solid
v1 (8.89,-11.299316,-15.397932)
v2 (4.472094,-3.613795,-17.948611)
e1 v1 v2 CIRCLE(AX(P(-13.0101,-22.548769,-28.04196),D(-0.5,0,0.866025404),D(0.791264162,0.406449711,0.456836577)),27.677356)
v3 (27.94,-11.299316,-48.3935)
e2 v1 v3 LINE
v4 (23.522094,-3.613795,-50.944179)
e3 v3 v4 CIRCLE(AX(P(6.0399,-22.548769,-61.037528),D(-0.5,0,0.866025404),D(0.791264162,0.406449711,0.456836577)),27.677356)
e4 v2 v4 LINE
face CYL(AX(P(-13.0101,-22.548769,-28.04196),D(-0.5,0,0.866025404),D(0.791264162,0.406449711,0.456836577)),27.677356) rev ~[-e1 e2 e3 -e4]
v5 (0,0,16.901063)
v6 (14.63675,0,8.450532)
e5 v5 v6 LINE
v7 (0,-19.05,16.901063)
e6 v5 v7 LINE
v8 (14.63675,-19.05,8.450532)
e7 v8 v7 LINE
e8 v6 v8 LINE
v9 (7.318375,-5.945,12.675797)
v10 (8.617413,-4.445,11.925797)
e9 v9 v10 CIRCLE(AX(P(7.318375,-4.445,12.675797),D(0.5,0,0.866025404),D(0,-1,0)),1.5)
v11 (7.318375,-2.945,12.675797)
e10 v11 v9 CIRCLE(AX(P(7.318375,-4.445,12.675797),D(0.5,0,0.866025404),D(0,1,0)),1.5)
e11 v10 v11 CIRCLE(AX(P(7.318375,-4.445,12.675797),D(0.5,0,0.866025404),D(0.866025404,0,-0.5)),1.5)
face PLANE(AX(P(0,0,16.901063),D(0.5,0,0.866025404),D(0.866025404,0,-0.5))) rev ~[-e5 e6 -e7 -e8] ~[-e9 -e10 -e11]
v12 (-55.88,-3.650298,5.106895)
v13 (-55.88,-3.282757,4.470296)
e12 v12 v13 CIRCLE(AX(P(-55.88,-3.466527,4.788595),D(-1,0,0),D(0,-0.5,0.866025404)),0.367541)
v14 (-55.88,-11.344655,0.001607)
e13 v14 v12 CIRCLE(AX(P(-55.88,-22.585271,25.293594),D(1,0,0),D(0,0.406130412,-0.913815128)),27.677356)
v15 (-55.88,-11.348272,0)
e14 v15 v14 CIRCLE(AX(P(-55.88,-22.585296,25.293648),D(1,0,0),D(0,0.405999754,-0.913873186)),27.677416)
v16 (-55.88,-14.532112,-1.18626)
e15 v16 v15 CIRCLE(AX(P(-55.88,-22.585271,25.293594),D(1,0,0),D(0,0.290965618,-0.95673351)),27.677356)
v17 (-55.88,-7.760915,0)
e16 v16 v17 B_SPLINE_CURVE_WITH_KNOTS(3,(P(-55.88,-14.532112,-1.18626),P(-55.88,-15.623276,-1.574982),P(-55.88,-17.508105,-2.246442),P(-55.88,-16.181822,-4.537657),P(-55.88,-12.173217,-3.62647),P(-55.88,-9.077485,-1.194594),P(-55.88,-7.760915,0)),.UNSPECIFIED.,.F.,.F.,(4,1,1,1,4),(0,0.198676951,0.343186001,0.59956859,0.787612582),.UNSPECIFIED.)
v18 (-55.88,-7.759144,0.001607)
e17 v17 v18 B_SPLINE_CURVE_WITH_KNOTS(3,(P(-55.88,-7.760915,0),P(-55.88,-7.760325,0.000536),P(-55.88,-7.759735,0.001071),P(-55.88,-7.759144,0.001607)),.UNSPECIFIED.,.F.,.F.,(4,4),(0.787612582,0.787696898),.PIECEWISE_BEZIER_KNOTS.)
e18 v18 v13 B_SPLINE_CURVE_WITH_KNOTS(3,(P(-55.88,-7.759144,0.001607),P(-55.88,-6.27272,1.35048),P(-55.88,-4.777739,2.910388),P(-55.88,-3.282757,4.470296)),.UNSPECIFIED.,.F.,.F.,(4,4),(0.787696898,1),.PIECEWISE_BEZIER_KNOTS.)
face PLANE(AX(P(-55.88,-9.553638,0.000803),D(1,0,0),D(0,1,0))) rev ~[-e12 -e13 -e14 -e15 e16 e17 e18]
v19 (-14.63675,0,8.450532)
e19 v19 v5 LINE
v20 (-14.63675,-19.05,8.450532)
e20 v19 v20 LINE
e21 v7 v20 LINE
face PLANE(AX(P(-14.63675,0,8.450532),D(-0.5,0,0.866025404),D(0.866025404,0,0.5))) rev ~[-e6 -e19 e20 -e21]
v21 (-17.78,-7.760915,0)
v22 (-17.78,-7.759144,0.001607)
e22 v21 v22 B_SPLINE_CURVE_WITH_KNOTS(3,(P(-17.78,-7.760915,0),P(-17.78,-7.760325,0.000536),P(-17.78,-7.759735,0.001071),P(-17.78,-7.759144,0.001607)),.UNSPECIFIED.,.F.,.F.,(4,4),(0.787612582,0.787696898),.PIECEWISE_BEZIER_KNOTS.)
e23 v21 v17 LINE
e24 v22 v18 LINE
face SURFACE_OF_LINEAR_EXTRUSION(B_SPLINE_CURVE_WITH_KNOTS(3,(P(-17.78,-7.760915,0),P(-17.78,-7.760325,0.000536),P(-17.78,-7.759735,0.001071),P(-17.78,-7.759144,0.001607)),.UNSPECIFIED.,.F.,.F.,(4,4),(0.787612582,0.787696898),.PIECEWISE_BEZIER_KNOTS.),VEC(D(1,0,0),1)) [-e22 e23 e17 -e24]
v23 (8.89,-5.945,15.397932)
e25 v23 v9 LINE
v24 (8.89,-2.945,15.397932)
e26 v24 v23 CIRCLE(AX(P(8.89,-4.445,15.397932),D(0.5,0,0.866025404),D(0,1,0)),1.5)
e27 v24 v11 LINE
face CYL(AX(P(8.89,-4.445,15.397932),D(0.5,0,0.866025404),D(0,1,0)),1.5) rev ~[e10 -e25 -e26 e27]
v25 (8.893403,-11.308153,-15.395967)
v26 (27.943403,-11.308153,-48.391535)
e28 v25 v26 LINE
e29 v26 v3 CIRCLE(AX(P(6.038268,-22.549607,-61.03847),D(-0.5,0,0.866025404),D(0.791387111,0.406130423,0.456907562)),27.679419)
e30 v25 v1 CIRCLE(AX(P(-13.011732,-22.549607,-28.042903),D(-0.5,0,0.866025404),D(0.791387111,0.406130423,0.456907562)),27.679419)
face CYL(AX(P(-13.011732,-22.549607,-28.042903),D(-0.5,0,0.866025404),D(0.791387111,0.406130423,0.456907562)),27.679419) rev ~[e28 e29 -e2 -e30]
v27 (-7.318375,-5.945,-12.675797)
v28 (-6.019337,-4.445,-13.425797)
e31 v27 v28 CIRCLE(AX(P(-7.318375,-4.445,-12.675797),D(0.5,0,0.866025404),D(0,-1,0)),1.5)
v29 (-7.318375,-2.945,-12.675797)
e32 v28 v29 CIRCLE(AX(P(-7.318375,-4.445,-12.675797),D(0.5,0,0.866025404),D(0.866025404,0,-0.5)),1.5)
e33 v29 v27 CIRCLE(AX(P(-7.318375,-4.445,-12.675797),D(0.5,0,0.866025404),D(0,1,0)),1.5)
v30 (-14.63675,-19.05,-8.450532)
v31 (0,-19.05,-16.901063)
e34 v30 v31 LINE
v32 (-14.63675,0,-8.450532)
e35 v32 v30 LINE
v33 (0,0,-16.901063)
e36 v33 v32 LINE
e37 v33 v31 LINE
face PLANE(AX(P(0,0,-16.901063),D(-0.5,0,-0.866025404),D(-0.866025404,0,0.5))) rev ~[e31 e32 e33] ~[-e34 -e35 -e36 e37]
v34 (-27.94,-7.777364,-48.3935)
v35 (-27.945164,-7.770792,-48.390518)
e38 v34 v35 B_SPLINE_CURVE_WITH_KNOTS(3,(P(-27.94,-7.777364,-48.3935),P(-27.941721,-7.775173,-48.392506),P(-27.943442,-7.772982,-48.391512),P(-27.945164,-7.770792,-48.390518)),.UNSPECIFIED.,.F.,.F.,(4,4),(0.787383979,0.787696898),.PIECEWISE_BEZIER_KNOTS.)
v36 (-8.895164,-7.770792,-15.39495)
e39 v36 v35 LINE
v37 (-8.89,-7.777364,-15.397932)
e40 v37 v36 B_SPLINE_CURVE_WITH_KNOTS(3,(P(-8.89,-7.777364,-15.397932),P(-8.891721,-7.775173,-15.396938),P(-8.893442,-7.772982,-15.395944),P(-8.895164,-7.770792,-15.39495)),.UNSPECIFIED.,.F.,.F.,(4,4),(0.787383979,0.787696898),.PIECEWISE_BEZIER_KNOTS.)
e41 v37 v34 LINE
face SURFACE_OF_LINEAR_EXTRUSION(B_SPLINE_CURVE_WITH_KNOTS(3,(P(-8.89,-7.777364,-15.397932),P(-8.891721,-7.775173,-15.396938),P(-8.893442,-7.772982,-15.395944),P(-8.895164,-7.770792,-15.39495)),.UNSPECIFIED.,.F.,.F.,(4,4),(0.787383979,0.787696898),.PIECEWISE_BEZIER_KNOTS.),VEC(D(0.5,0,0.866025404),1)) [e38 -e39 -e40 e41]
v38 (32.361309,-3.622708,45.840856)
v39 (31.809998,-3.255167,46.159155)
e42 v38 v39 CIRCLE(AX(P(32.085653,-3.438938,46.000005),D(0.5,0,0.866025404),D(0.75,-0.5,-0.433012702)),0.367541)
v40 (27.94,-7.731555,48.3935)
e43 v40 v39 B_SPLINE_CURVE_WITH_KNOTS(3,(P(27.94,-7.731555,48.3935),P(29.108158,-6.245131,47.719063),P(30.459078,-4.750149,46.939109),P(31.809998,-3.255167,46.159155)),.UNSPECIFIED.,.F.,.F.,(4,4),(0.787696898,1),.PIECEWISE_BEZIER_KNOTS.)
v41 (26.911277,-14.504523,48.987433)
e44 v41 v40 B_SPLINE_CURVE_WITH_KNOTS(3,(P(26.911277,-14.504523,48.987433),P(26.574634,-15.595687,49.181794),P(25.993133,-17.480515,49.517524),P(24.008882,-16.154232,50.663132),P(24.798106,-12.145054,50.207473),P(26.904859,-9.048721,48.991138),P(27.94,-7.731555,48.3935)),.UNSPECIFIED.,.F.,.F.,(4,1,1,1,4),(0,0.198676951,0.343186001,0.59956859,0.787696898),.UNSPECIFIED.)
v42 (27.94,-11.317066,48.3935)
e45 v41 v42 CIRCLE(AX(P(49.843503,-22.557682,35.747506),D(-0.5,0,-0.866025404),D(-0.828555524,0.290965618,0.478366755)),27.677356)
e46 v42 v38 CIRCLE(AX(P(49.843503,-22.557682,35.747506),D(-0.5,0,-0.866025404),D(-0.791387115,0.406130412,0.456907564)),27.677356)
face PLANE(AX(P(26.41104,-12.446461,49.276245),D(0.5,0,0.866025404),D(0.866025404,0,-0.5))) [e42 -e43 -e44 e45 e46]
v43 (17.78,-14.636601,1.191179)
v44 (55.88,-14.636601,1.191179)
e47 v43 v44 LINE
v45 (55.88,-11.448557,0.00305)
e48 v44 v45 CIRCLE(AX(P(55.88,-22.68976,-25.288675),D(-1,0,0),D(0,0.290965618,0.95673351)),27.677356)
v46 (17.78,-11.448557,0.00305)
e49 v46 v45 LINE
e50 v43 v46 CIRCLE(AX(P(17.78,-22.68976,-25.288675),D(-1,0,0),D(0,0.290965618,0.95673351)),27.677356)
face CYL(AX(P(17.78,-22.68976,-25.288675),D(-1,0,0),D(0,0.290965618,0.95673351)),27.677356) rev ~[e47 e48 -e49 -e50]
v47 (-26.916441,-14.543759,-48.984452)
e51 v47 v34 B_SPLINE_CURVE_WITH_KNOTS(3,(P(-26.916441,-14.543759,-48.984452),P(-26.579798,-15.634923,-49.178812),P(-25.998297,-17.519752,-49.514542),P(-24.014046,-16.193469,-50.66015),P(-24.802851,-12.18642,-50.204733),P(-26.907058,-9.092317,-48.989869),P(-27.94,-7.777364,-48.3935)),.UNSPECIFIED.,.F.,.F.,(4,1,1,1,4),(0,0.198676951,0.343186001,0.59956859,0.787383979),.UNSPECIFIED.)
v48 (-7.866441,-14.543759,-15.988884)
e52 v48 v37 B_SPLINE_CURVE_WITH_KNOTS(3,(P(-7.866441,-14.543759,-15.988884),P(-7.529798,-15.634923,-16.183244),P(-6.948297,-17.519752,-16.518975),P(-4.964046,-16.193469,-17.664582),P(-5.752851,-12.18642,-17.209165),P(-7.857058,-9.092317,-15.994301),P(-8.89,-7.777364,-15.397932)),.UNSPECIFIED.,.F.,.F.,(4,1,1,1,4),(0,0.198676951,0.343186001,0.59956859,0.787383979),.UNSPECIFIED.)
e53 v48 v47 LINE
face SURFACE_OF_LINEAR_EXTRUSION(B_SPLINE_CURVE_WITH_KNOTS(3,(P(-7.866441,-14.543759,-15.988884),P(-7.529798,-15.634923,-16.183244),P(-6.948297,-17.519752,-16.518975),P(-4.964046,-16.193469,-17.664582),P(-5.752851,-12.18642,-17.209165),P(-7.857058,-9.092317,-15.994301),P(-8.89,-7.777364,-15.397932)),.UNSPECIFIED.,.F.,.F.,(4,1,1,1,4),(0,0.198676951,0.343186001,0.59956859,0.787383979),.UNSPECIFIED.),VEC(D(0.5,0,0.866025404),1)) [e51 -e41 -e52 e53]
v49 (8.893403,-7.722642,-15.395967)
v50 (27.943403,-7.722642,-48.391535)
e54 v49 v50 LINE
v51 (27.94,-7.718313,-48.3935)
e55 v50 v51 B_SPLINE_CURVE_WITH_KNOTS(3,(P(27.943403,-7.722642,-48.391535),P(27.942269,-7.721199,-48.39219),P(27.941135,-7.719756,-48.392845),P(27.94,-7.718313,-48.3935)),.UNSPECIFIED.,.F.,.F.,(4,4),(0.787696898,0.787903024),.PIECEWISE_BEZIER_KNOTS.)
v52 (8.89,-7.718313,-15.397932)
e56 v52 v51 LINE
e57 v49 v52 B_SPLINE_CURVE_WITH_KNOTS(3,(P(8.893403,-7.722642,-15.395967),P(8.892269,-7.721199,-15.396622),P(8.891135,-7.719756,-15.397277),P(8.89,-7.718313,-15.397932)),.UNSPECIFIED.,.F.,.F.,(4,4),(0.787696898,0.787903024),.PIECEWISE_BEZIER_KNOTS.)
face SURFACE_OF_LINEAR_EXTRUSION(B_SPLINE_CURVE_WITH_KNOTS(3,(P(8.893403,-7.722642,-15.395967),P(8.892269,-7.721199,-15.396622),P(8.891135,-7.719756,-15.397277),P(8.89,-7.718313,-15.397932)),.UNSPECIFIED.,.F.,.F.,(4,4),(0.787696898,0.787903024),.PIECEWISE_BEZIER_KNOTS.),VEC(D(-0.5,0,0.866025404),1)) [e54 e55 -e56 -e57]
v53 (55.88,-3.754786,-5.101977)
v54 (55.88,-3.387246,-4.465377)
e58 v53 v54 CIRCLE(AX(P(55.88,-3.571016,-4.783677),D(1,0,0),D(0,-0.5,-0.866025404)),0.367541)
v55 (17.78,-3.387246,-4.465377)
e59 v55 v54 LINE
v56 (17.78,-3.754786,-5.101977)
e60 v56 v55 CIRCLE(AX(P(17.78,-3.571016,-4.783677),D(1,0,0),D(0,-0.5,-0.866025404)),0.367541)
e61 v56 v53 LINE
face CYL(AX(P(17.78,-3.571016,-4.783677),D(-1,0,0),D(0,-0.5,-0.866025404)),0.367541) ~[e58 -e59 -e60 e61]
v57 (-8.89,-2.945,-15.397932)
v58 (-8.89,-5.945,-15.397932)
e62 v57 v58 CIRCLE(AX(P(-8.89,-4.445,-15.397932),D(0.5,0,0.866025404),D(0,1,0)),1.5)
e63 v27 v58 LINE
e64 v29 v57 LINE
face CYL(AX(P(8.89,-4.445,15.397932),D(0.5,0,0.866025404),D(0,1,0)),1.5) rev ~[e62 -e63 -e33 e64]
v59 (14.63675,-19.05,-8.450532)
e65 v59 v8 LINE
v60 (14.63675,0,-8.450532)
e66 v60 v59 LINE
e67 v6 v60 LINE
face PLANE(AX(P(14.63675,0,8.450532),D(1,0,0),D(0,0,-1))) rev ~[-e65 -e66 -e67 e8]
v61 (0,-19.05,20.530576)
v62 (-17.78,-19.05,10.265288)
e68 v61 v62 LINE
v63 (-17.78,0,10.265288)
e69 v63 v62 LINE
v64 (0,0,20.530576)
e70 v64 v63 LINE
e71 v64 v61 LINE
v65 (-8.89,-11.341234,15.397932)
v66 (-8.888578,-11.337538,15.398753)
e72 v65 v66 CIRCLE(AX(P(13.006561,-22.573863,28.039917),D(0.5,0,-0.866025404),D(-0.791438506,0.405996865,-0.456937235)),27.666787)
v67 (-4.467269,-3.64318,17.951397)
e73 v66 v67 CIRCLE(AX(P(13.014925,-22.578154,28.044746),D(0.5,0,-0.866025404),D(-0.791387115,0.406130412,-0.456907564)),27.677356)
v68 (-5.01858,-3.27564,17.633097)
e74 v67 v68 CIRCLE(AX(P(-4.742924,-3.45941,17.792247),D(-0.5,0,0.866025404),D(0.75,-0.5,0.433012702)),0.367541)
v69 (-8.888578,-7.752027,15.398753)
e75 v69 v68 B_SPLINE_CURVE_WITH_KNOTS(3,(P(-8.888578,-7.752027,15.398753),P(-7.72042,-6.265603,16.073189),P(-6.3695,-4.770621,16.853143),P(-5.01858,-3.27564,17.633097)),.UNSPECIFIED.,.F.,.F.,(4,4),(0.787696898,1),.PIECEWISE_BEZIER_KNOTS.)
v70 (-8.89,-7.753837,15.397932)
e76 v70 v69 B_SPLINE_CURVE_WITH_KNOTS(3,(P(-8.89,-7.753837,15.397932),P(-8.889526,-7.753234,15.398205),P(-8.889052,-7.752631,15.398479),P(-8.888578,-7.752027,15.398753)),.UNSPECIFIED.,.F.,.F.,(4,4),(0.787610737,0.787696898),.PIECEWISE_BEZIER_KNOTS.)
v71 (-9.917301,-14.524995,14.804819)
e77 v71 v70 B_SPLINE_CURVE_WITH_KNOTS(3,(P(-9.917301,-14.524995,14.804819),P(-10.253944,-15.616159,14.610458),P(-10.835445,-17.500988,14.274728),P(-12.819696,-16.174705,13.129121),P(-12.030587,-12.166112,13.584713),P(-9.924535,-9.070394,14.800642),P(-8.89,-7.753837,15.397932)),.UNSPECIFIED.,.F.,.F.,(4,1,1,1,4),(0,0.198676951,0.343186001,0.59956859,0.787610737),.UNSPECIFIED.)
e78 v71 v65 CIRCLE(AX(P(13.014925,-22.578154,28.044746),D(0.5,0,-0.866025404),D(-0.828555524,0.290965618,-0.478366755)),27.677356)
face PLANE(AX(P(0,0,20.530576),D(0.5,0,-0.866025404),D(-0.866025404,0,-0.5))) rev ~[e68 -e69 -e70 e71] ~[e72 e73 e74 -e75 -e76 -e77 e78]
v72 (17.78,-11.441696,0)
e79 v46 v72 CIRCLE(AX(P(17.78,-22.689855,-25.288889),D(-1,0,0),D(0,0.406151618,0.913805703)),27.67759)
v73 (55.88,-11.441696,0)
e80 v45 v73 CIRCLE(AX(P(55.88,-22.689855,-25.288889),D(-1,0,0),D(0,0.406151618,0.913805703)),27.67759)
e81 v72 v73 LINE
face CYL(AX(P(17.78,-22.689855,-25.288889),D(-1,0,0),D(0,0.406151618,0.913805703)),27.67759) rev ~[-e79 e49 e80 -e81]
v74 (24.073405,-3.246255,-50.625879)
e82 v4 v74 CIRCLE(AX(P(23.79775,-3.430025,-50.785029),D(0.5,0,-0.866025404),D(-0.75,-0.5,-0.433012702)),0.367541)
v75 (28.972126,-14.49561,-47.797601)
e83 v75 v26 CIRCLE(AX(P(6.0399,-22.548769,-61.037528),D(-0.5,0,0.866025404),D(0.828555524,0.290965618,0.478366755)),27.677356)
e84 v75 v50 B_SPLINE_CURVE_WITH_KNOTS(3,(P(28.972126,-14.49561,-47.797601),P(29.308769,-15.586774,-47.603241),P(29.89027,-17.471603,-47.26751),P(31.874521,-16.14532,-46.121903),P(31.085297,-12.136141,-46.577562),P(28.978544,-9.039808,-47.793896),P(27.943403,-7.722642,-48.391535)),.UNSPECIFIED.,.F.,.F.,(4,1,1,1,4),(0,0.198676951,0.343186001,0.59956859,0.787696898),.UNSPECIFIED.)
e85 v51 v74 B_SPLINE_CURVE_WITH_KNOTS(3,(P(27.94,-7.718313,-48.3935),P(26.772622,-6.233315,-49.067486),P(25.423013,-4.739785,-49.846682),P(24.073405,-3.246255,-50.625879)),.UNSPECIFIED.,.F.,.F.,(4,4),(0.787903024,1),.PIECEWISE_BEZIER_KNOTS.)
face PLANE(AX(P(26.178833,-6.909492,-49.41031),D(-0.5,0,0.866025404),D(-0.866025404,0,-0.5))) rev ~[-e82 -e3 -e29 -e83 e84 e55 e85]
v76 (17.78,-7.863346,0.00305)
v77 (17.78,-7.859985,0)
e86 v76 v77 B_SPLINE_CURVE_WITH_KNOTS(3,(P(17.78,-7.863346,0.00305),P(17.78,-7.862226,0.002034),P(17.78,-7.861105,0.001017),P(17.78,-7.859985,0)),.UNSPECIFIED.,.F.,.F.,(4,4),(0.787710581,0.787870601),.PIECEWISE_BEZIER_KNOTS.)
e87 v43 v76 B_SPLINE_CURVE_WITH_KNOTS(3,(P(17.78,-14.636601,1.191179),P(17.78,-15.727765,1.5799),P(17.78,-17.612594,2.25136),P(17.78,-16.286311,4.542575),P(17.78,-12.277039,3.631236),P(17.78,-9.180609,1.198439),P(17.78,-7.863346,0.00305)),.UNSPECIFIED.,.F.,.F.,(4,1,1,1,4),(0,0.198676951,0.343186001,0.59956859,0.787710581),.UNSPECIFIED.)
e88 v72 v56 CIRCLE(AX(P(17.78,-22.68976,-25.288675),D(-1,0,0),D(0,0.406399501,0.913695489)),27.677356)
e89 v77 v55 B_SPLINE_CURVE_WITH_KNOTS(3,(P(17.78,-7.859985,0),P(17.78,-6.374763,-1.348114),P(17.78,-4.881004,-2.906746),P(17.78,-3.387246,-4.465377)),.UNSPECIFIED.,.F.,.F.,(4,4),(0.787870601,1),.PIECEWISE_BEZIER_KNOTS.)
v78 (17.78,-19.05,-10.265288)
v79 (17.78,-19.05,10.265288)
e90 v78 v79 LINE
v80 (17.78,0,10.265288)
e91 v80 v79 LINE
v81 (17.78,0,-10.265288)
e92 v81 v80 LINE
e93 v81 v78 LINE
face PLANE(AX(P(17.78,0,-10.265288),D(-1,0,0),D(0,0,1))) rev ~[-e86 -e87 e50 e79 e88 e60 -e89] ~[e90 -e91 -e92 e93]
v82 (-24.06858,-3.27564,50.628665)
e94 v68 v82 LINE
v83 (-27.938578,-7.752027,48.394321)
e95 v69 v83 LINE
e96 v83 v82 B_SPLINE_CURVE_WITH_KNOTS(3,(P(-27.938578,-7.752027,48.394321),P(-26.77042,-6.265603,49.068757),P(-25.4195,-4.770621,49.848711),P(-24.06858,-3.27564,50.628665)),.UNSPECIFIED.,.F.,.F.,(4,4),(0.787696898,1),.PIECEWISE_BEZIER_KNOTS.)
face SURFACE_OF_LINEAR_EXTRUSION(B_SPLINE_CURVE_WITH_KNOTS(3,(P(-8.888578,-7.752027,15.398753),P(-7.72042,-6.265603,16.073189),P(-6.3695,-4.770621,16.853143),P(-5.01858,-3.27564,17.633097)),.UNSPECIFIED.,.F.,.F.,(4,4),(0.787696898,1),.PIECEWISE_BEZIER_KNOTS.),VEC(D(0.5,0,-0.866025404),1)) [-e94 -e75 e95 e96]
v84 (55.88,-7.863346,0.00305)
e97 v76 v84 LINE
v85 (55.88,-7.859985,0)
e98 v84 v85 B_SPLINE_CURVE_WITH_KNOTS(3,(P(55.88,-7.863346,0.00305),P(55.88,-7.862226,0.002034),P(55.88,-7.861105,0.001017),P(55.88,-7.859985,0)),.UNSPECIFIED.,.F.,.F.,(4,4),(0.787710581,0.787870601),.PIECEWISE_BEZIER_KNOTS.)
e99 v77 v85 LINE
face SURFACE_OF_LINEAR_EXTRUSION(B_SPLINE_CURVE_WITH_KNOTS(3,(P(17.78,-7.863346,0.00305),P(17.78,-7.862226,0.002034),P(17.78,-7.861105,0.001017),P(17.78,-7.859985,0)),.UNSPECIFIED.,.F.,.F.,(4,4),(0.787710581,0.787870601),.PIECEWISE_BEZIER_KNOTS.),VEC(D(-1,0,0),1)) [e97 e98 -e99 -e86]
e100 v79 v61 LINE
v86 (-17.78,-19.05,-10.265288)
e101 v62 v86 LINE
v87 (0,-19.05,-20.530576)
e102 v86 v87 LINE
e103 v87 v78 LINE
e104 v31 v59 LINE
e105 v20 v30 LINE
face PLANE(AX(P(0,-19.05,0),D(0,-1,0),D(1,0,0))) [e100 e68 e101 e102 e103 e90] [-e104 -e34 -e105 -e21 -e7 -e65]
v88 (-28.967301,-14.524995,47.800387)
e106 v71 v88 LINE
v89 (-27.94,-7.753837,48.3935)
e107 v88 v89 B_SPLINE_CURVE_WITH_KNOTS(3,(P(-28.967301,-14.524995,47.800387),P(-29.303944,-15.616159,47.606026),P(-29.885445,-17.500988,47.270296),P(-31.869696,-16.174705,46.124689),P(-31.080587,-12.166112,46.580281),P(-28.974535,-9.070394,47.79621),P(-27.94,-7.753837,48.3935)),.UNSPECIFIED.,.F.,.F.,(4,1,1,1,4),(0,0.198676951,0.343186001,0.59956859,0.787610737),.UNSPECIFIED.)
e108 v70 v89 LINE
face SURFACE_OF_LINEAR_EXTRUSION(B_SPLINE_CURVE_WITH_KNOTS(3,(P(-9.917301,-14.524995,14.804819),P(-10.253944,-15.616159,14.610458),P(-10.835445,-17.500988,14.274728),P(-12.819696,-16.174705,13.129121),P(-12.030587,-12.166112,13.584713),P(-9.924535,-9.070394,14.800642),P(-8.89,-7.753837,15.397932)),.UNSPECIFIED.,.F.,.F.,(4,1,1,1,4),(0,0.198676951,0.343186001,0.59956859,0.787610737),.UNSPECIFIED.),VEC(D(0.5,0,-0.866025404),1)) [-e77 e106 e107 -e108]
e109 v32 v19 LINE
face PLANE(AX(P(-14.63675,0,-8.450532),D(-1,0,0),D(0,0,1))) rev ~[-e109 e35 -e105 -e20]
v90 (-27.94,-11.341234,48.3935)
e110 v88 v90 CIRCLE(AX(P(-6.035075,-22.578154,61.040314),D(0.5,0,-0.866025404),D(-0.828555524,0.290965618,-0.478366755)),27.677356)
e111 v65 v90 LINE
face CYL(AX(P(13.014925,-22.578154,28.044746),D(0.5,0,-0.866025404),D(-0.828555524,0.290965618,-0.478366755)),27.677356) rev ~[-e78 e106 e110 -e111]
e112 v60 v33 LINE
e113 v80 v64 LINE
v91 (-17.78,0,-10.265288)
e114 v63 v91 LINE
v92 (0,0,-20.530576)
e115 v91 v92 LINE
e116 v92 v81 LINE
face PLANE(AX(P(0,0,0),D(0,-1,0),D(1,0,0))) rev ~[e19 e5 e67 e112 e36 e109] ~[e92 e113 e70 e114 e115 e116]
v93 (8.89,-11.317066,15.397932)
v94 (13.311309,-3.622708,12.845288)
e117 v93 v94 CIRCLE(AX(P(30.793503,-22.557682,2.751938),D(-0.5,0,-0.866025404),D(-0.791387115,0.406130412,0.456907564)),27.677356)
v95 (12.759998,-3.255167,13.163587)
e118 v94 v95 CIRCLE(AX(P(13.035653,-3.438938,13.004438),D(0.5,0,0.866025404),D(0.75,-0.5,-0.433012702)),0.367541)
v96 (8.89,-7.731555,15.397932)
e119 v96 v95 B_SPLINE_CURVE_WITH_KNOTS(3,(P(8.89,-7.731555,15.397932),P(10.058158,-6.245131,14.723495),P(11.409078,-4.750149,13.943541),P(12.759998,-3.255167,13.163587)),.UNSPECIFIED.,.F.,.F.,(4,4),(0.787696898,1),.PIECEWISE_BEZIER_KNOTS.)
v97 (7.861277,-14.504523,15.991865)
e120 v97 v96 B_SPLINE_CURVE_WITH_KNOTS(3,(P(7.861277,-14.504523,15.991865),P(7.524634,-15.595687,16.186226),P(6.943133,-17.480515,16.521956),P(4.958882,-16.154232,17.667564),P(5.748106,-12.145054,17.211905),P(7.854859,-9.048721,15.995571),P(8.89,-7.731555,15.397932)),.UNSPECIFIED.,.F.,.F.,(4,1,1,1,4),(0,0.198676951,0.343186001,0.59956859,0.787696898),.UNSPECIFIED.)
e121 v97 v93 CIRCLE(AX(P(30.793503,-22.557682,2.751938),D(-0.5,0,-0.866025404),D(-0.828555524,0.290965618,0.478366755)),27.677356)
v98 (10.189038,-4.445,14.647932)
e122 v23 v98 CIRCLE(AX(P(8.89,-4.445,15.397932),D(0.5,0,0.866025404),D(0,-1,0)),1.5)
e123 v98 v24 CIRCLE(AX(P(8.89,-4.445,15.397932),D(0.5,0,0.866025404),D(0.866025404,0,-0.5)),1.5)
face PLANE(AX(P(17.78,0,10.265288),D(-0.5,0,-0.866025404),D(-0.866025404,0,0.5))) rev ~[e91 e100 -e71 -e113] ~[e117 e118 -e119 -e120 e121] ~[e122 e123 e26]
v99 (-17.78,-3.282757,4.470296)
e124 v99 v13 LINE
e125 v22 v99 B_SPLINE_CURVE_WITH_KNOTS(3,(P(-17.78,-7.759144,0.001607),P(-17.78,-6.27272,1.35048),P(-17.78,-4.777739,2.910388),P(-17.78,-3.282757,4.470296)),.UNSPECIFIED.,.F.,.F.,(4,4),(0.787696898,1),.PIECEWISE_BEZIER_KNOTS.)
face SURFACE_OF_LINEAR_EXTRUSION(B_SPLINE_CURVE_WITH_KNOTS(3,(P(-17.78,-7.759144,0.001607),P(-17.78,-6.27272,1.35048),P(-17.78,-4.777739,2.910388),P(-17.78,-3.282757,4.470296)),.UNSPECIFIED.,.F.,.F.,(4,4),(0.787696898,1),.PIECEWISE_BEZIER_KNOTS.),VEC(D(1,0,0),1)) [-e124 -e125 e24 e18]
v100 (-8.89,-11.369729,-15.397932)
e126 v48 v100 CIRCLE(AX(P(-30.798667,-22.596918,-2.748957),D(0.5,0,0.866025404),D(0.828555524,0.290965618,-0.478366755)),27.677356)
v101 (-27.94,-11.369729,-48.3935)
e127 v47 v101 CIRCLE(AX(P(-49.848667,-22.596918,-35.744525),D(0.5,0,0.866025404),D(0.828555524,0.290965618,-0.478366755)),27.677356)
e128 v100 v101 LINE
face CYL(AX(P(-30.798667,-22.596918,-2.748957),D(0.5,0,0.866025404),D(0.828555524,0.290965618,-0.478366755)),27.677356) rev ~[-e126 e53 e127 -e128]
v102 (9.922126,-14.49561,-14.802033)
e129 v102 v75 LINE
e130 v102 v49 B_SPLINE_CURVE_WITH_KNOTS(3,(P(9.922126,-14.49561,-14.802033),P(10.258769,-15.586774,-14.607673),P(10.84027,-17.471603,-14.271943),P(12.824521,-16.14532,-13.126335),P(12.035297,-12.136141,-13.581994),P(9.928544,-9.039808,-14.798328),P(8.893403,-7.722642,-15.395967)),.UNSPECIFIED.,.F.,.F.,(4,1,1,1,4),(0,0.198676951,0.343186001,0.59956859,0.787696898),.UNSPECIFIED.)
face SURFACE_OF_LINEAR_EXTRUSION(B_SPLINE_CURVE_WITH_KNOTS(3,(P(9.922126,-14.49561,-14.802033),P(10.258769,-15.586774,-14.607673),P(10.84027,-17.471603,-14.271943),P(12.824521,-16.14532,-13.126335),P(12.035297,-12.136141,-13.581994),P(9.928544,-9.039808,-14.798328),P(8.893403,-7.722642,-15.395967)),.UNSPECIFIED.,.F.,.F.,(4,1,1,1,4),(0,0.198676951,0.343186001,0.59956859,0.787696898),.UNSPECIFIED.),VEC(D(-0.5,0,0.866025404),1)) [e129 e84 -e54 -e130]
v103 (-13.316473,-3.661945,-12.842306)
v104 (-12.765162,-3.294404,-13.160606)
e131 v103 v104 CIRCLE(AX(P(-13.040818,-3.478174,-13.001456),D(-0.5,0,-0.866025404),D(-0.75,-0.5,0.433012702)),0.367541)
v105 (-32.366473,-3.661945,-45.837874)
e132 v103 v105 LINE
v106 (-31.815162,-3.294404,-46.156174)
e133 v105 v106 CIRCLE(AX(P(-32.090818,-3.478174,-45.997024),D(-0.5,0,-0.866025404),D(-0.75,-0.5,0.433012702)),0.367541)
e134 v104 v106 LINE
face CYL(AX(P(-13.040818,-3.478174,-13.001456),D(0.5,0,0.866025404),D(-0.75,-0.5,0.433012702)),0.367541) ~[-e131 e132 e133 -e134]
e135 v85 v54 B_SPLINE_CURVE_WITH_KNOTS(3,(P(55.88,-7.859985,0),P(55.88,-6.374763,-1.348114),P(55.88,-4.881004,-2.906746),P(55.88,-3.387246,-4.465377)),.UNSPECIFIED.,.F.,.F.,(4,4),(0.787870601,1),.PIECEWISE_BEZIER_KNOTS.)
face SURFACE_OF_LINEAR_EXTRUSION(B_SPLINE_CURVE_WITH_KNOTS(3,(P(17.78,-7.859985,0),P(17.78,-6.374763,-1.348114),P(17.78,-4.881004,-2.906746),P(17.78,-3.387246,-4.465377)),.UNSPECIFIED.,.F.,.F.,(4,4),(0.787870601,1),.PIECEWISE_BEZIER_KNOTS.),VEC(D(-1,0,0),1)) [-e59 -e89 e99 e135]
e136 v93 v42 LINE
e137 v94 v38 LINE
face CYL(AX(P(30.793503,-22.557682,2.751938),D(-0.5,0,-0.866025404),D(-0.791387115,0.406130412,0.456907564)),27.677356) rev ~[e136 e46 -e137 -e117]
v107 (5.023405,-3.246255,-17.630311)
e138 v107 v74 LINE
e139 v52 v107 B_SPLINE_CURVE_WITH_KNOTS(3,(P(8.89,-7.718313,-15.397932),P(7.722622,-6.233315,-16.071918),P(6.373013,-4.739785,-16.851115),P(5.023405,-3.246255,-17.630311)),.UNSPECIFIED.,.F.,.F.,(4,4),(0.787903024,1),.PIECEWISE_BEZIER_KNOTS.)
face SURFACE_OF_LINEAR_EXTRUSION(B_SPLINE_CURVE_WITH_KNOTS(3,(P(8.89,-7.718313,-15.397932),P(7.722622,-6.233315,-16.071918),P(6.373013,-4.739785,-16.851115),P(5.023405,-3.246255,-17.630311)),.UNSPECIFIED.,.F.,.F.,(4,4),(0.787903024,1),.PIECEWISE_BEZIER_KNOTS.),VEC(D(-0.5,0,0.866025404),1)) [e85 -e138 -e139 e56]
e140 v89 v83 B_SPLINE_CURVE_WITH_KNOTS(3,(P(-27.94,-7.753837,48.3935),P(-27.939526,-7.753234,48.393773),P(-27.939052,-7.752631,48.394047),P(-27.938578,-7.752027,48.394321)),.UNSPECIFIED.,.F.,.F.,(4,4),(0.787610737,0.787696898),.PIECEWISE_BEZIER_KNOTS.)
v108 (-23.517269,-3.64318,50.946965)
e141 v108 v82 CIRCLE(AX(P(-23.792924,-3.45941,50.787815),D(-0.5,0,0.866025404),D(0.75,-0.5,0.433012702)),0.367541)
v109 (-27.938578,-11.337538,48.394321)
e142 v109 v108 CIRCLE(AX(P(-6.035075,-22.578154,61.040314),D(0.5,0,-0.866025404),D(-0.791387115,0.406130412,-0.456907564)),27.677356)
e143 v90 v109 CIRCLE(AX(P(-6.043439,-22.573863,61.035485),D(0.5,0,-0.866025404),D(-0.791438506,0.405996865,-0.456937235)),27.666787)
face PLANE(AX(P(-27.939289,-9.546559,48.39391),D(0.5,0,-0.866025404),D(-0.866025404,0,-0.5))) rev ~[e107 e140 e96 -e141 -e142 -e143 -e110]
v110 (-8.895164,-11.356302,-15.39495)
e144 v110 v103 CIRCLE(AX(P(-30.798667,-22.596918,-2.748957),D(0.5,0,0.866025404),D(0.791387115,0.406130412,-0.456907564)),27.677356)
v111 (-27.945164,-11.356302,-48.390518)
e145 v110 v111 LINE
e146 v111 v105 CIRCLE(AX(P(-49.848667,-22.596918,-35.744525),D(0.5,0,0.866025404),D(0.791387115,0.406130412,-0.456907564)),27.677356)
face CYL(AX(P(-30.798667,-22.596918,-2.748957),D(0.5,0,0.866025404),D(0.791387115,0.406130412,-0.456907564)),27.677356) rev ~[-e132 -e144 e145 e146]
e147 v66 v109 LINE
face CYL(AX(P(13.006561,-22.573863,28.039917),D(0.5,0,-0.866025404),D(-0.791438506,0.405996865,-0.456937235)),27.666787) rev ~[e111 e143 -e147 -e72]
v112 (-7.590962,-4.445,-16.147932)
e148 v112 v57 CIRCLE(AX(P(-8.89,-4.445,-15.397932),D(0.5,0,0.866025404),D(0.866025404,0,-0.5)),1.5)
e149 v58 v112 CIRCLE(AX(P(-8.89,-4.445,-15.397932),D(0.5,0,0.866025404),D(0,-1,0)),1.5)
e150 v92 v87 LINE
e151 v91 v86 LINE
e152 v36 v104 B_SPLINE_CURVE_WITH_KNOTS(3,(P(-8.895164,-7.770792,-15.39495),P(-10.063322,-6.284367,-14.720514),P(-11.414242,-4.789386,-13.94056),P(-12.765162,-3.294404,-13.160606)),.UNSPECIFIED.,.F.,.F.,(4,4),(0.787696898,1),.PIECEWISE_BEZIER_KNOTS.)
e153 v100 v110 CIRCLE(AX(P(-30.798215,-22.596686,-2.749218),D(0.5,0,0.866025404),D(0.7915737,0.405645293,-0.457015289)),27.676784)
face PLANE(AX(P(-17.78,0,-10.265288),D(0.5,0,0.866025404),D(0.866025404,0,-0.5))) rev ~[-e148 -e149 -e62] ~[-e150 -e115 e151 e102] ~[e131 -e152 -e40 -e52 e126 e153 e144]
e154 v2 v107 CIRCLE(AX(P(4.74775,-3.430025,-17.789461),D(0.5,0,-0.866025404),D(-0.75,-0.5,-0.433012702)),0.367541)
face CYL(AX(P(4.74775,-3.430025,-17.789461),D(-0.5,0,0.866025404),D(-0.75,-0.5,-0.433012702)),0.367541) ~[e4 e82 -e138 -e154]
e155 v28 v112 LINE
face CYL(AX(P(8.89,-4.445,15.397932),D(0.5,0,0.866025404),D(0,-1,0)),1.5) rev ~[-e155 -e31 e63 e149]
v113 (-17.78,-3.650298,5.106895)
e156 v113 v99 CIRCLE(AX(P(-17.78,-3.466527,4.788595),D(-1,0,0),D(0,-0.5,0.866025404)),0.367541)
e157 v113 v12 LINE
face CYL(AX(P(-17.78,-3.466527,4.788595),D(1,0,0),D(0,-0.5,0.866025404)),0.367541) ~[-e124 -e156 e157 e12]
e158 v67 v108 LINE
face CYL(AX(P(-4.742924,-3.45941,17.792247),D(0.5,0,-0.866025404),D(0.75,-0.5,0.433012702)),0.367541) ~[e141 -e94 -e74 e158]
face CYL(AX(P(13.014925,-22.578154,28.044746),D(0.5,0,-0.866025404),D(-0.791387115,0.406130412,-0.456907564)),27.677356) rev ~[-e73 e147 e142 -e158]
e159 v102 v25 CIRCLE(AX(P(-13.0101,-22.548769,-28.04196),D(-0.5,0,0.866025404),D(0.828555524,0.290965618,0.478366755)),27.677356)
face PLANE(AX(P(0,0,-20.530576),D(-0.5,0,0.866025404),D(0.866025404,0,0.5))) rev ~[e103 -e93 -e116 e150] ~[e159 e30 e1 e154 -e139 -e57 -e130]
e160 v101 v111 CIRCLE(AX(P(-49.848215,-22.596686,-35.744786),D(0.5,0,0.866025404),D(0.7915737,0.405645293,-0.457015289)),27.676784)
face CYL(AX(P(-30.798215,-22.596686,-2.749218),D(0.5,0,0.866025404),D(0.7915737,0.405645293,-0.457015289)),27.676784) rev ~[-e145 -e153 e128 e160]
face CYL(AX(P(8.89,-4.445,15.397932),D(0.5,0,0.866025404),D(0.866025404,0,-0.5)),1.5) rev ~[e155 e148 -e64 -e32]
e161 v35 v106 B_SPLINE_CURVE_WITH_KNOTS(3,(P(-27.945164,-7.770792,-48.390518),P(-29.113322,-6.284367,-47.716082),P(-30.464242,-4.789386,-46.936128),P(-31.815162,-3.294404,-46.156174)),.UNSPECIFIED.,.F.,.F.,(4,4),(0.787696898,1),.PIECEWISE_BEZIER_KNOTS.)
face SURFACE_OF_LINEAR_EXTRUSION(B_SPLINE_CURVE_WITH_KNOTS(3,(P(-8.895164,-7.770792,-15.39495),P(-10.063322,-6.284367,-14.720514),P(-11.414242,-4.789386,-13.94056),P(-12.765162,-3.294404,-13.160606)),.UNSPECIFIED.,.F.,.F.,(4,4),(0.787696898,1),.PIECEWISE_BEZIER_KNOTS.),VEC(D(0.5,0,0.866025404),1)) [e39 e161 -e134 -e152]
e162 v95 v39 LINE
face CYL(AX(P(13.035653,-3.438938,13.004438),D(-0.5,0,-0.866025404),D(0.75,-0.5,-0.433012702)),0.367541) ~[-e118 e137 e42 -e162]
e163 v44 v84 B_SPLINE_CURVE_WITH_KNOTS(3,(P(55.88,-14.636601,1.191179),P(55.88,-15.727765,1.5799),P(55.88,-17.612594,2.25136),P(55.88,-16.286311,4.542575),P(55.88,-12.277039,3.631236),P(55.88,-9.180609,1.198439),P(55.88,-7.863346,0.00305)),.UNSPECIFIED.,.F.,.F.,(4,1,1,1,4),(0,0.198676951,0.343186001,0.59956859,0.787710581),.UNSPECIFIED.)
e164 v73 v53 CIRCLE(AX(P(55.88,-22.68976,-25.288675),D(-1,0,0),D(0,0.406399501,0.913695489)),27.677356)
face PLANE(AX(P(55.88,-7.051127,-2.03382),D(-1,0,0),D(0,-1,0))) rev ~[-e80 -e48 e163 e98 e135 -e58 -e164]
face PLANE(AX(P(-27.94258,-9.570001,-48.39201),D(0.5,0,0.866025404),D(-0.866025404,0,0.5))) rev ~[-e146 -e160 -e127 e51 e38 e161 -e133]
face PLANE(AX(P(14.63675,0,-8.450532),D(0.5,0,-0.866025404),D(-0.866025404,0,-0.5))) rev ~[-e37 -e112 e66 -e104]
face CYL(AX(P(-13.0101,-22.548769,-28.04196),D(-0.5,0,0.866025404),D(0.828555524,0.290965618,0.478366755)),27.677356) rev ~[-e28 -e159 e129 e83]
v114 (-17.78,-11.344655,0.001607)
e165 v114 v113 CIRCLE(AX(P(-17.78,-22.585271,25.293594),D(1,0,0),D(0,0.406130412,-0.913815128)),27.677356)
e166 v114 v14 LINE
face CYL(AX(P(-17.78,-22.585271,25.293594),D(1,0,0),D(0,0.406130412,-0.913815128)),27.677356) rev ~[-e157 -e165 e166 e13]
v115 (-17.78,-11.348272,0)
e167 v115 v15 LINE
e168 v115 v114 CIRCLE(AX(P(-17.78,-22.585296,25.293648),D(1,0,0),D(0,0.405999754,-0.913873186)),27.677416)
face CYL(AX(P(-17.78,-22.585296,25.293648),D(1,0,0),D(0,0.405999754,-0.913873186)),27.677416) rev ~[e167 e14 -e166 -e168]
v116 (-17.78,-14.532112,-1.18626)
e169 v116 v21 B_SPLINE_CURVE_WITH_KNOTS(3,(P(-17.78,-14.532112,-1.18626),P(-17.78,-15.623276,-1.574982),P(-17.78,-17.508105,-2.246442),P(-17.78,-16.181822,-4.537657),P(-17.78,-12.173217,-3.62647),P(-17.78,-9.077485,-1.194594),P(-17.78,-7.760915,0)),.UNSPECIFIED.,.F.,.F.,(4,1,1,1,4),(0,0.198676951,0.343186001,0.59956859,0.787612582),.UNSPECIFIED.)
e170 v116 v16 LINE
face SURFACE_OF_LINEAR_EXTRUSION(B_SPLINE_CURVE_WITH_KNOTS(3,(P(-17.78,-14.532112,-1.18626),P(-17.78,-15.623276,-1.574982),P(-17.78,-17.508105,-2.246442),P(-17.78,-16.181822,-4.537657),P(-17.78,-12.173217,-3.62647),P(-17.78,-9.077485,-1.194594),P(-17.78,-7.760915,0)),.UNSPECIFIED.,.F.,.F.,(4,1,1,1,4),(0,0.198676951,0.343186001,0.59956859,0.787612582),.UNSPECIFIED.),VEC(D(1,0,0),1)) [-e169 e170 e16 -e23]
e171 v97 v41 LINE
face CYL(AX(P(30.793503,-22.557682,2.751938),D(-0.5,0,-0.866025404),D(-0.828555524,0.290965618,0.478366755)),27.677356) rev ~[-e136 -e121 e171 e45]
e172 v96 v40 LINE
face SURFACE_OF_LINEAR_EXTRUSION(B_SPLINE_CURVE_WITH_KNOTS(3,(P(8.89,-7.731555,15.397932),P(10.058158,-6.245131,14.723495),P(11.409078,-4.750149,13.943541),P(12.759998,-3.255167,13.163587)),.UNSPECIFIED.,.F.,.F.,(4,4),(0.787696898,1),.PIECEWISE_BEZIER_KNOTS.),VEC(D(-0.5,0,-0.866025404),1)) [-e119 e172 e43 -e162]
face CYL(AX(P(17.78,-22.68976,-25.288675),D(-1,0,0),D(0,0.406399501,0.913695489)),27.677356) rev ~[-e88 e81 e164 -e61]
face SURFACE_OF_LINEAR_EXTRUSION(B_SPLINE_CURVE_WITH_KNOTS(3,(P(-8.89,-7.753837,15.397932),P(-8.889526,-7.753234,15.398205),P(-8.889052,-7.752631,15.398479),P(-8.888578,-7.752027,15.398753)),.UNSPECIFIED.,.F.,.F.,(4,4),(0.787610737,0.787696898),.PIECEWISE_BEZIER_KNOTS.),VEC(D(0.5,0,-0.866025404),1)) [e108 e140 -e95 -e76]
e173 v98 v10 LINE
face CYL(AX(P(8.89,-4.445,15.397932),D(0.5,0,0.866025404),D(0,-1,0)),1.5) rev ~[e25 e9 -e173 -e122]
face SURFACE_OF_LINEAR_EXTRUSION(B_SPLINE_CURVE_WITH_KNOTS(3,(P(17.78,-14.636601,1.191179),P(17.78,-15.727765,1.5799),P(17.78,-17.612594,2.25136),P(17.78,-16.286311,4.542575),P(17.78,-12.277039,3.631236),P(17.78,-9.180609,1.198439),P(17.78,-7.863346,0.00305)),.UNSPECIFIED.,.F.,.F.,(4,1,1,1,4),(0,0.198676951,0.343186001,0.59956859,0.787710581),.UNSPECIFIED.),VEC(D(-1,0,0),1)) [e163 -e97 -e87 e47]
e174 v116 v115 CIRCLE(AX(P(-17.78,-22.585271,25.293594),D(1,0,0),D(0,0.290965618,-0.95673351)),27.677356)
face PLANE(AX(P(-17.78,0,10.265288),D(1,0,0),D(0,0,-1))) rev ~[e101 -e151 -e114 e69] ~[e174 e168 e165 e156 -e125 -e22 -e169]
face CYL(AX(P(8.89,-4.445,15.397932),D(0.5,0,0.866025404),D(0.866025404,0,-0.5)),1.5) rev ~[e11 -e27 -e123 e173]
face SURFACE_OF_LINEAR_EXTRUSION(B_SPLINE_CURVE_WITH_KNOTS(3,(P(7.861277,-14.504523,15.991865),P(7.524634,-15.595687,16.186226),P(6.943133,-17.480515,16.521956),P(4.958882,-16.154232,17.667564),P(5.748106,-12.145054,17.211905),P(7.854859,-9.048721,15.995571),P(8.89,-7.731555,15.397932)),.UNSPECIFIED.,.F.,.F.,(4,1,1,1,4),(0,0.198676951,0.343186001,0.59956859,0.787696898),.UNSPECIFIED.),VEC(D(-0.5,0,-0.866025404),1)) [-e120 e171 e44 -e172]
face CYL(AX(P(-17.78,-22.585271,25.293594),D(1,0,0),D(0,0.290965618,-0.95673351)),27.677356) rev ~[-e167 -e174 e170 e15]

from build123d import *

# Parameters (mm, degrees)
F1_DEPTH  = 19.05
F8_DEPTH  = 38.1
F9_DEPTH  = 38.1
F10_DEPTH = 38.1
F11_DEPTH = 38.1
F12_DEPTH = 38.1
F13_DEPTH = 38.1
F15_DEPTH = 19.0510001
F16_DEPTH = 89.8612751667


# Not quite as in the source:
# - a feature of the source that left no trace in its solid (it failed there, or was rolled back) is left out


with BuildPart() as f1:
    # F0 (on Front) → F1 (new body)
    with BuildSketch(Plane.XZ):
        Polygon((17.78, -10.2652877862), (17.78, 10.2652877862), (0, 20.5305755724), (-17.78, 10.2652877862), (-17.78, -10.2652877862), (0, -20.5305755724), align=None)
    extrude(amount=F1_DEPTH)

    # F7 (on face) → F8 (join)
    with BuildSketch(Plane(origin=(-8.89, 0, 15.3979316793), x_dir=(0.8660254038, 0, 0.5), z_dir=(-0.5, 0, 0.8660254038))):
        with BuildLine():
            add(Edge.make_bspline(
                [(0, -7.7538370491), (0.0005473534, -7.7532338055), (0.0010947416, -7.7526305605), (0.0016421645, -7.7520273142)],
                knots=[0.7876107373, 0.7876107373, 0.7876107373, 0.7876107373, 0.7876968979, 0.7876968979, 0.7876968979, 0.7876968979], degree=3))
            Line((0, -7.7538370491), (0, -11.3412338568))
            ThreePointArc((0, -11.3412338568), (0.0008210147, -11.3393859842), (0.0016421645, -11.3375381715))
            Line((0.0016421645, -11.3375381715), (0.0016421645, -7.7520273142))
        make_face()
        with BuildLine():
            Line((0, -11.3412338568), (0, -7.7538370491))
            add(Edge.make_bspline(
                [(-1.1862251705, -14.5249951817), (-1.5749463751, -15.6161587285), (-2.2464066272, -17.5009876017), (-4.5376219484, -16.1747046), (-3.6264374582, -12.1661122368), (-1.1945785451, -9.0703938169), (0, -7.7538370491)],
                knots=[0, 0, 0, 0, 0.1986769511, 0.3431860009, 0.5995685898, 0.7876107373, 0.7876107373, 0.7876107373, 0.7876107373], degree=3))
            ThreePointArc((-1.1862251705, -14.5249951817), (-0.6420119978, -12.9148952786), (0, -11.3412338568))
        make_face()
        with BuildLine():
            add(Edge.make_bspline(
                [(0.0016421645, -7.7520273142), (1.3505150143, -6.2656031483), (2.9104228785, -4.7706214018), (4.4703307428, -3.2756396553)],
                knots=[0.7876968979, 0.7876968979, 0.7876968979, 0.7876968979, 1, 1, 1, 1], degree=3))
            Line((0.0016421645, -7.7520273142), (0.0016421645, -11.3375381715))
            ThreePointArc((0.0016421645, -11.3375381715), (2.2311378018, -7.2759469782), (5.1069300621, -3.6431804437))
            ThreePointArc((5.1069300621, -3.6431804437), (4.9724007966, -3.1411103898), (4.4703307428, -3.2756396553))
        make_face()
    extrude(amount=F8_DEPTH)

    # F2 (on face) → F9 (join)
    with BuildSketch(Plane(origin=(8.89, 0, 15.3979316793), x_dir=(0.8660254038, 0, -0.5), z_dir=(0.5, 0, 0.8660254038))):
        with BuildLine():
            Line((0, -11.3170660089), (0, -7.7315551515))
            add(Edge.make_bspline(
                [(-1.187867335, -14.5045230191), (-1.5765885396, -15.5956865658), (-2.2480487917, -17.4805154391), (-4.5392641129, -16.1542324374), (-3.6279463171, -12.1450536205), (-1.1952777162, -9.0487213191), (0, -7.7315551515)],
                knots=[0, 0, 0, 0, 0.1986769511, 0.3431860009, 0.5995685898, 0.7876968979, 0.7876968979, 0.7876968979, 0.7876968979], degree=3))
            ThreePointArc((-1.187867335, -14.5045230191), (-0.6429481144, -12.8925283349), (0, -11.3170660089))
        make_face()
        with BuildLine():
            add(Edge.make_bspline(
                [(0, -7.7315551515), (1.3488728498, -6.2451309857), (2.9087807141, -4.7501492392), (4.4686885783, -3.2551674926)],
                knots=[0.7876968979, 0.7876968979, 0.7876968979, 0.7876968979, 1, 1, 1, 1], degree=3))
            Line((0, -7.7315551515), (0, -11.3170660089))
            ThreePointArc((0, -11.3170660089), (2.2294956373, -7.2554748155), (5.1052878976, -3.622708281))
            ThreePointArc((5.1052878976, -3.622708281), (4.9707586321, -3.1206382272), (4.4686885783, -3.2551674926))
        make_face()
    extrude(amount=F9_DEPTH)

    # F3 (on face) → F10 (join)
    with BuildSketch(Plane.YZ.offset(17.78)):
        with BuildLine():
            add(Edge.make_bspline(
                [(-7.8599847579, 0), (-6.3747627763, -1.3481141297), (-4.8810042018, -2.9067457003), (-3.3872456274, -4.4653772708)],
                knots=[0.7878706011, 0.7878706011, 0.7878706011, 0.7878706011, 1, 1, 1, 1], degree=3))
            Line((-7.8599847579, 0), (-11.4416964799, 0))
            ThreePointArc((-11.4416964799, 0), (-7.3841573188, -2.2284377273), (-3.7547864157, -5.1019765901))
            ThreePointArc((-3.7547864157, -5.1019765901), (-3.2527163619, -4.9674473247), (-3.3872456274, -4.4653772708))
        make_face()
        with BuildLine():
            Line((-11.4416964799, 0), (-7.8599847579, 0))
            add(Edge.make_bspline(
                [(-7.8633458805, 0.0030504953), (-7.8622255112, 0.0020337834), (-7.8611051369, 0.0010169516), (-7.8599847579, 0)],
                knots=[0.7877105811, 0.7877105811, 0.7877105811, 0.7877105811, 0.7878706011, 0.7878706011, 0.7878706011, 0.7878706011], degree=3))
            Line((-7.8633458805, 0.0030504953), (-11.4485573206, 0.0030504953))
            ThreePointArc((-11.4485573206, 0.0030504953), (-11.4451267968, 0.0015254803), (-11.4416964799, 0))
        make_face()
        with BuildLine():
            Line((-11.4485573206, 0.0030504953), (-7.8633458805, 0.0030504953))
            add(Edge.make_bspline(
                [(-14.6366011538, 1.1911786424), (-15.7277647005, 1.5798998471), (-17.6125935738, 2.2513600991), (-16.2863105721, 4.5425754204), (-12.2770386202, 3.6312364543), (-9.1806088275, 1.1984392543), (-7.8633458805, 0.0030504953)],
                knots=[0, 0, 0, 0, 0.1986769511, 0.3431860009, 0.5995685898, 0.7877105811, 0.7877105811, 0.7877105811, 0.7877105811], degree=3))
            ThreePointArc((-14.6366011538, 1.1911786424), (-13.0243055984, 0.6461472944), (-11.4485573206, 0.0030504953))
        make_face()
    extrude(amount=F10_DEPTH)

    # F4 (on face) → F11 (join)
    with BuildSketch(Plane(origin=(8.89, 0, -15.3979316793), x_dir=(0.8660254038, 0, 0.5), z_dir=(0.5, 0, -0.8660254038))):
        with BuildLine():
            add(Edge.make_bspline(
                [(0, 7.7183126767), (-1.3479724171, 6.2333150924), (-2.9063657613, 4.7397848289), (-4.4647591055, 3.2462545654)],
                knots=[0.7879030237, 0.7879030237, 0.7879030237, 0.7879030237, 1, 1, 1, 1], degree=3))
            Line((0, 7.7183126767), (0, 11.2993157186))
            ThreePointArc((0, 11.2993157186), (-2.2282401234, 7.2425326354), (-5.1013584248, 3.6137953538))
            ThreePointArc((-5.1013584248, 3.6137953538), (-4.9668291593, 3.1117253), (-4.4647591055, 3.2462545654))
        make_face()
        with BuildLine():
            Line((0, 11.2993157186), (0, 7.7183126767))
            add(Edge.make_bspline(
                [(0.0039294728, 7.7226422243), (0.0026198474, 7.7211990498), (0.0013100231, 7.7197558673), (0, 7.7183126767)],
                knots=[0.7876968979, 0.7876968979, 0.7876968979, 0.7876968979, 0.7879030237, 0.7879030237, 0.7879030237, 0.7879030237], degree=3))
            Line((0.0039294728, 7.7226422243), (0.0039294728, 11.3081530816))
            ThreePointArc((0.0039294728, 11.3081530816), (0.0019651224, 11.3037342285), (0, 11.2993157186))
        make_face()
        with BuildLine():
            Line((0.0039294728, 11.3081530816), (0.0039294728, 7.7226422243))
            add(Edge.make_bspline(
                [(1.1917968078, 14.4956100919), (1.5805180124, 15.5867736386), (2.2519782645, 17.4716025119), (4.5431935857, 16.1453195102), (3.63187579, 12.1361406932), (1.199207189, 9.0398083919), (0.0039294728, 7.7226422243)],
                knots=[0, 0, 0, 0, 0.1986769511, 0.3431860009, 0.5995685898, 0.7876968979, 0.7876968979, 0.7876968979, 0.7876968979], degree=3))
            ThreePointArc((1.1917968078, 14.4956100919), (0.6468775872, 12.8836154077), (0.0039294728, 11.3081530816))
        make_face()
    extrude(amount=F11_DEPTH)

    # F5 (on face) → F12 (join)
    with BuildSketch(Plane(origin=(-8.89, 0, -15.3979316793), x_dir=(0.8660254038, 0, -0.5), z_dir=(-0.5, 0, -0.8660254038))):
        with BuildLine():
            add(Edge.make_bspline(
                [(0, 7.7773641781), (-0.0019872196, 7.7751733378), (-0.0039748984, 7.7729824789), (-0.0059630356, 7.7707916014)],
                knots=[0.787383979, 0.787383979, 0.787383979, 0.787383979, 0.7876968979, 0.7876968979, 0.7876968979, 0.7876968979], degree=3))
            Line((0, 7.7773641781), (0, 11.3697292081))
            ThreePointArc((0, 11.3697292081), (-0.0029806269, 11.3630154378), (-0.0059630356, 11.3563024588))
            Line((-0.0059630356, 11.3563024588), (-0.0059630356, 7.7707916014))
        make_face()
        with BuildLine():
            Line((0, 11.3697292081), (0, 7.7773641781))
            add(Edge.make_bspline(
                [(1.1819042994, 14.543759469), (1.570625504, 15.6349230157), (2.2420857561, 17.519751889), (4.5333010773, 16.1934688873), (3.6224674222, 12.18641996), (1.1927388288, 9.092317135), (0, 7.7773641781)],
                knots=[0, 0, 0, 0, 0.1986769511, 0.3431860009, 0.5995685898, 0.787383979, 0.787383979, 0.787383979, 0.787383979], degree=3))
            ThreePointArc((1.1819042994, 14.543759469), (0.6395493316, 12.9386483491), (0, 11.3697292081))
        make_face()
        with BuildLine():
            add(Edge.make_bspline(
                [(-0.0059630356, 7.7707916014), (-1.3548358854, 6.2843674356), (-2.9147437496, 4.7893856891), (-4.4746516139, 3.2944039425)],
                knots=[0.7876968979, 0.7876968979, 0.7876968979, 0.7876968979, 1, 1, 1, 1], degree=3))
            Line((-0.0059630356, 7.7707916014), (-0.0059630356, 11.3563024588))
            ThreePointArc((-0.0059630356, 11.3563024588), (-2.2354586728, 7.2947112654), (-5.1112509332, 3.6619447309))
            ThreePointArc((-5.1112509332, 3.6619447309), (-4.9767216677, 3.1598746771), (-4.4746516139, 3.2944039425))
        make_face()
    extrude(amount=F12_DEPTH)

    # F6 (on face) → F13 (join)
    with BuildSketch(Plane(origin=(-17.78, 0, 0), x_dir=(0, -1, 0), z_dir=(-1, 0, 0))):
        with BuildLine():
            add(Edge.make_bspline(
                [(7.7609154689, 0), (7.760325141, 0.0005356357), (7.7597348118, 0.0010713047), (7.7591444813, 0.0016070071)],
                knots=[0.7876125821, 0.7876125821, 0.7876125821, 0.7876125821, 0.7876968979, 0.7876968979, 0.7876968979, 0.7876968979], degree=3))
            Line((7.7609154689, 0), (11.348271887, 0))
            ThreePointArc((11.348271887, 0), (11.3464635841, 0.0008034389), (11.3446553386, 0.0016070071))
            Line((11.3446553386, 0.0016070071), (7.7591444813, 0.0016070071))
        make_face()
        with BuildLine():
            Line((11.348271887, 0), (7.7609154689, 0))
            add(Edge.make_bspline(
                [(14.5321123488, -1.1862603279), (15.6232758956, -1.5749815326), (17.5081047688, -2.2464417846), (16.1818217672, -4.5376571059), (12.1732168477, -3.6264697615), (9.0774852842, -1.1945935139), (7.7609154689, 0)],
                knots=[0, 0, 0, 0, 0.1986769511, 0.3431860009, 0.5995685898, 0.7876125821, 0.7876125821, 0.7876125821, 0.7876125821], degree=3))
            ThreePointArc((14.5321123488, -1.1862603279), (12.9219718729, -0.6420320383), (11.348271887, 0))
        make_face()
        with BuildLine():
            add(Edge.make_bspline(
                [(7.7591444813, 0.0016070071), (6.2727203155, 1.3504798569), (4.7777385689, 2.9103877211), (3.2827568224, 4.4702955854)],
                knots=[0.7876968979, 0.7876968979, 0.7876968979, 0.7876968979, 1, 1, 1, 1], degree=3))
            Line((7.7591444813, 0.0016070071), (11.3446553386, 0.0016070071))
            ThreePointArc((11.3446553386, 0.0016070071), (7.2830641453, 2.2311026443), (3.6502976108, 5.1068949047))
            ThreePointArc((3.6502976108, 5.1068949047), (3.148227557, 4.9723656392), (3.2827568224, 4.4702955854))
        make_face()
    extrude(amount=F13_DEPTH)

    # F14 (on face) → F15 (cut, through all)
    with BuildSketch(Plane(origin=(0, 0, 0), x_dir=(-1, 0, 0), z_dir=(0, 1, 0))):
        Polygon((-14.63675, -8.4505315526), (0, -16.9010631051), (14.63675, -8.4505315526), (14.63675, 8.4505315526), (0, 16.9010631051), (-14.63675, 8.4505315526), align=None)
    extrude(amount=-F15_DEPTH, mode=Mode.SUBTRACT)

    # F2 (on face) → F16 (cut, through all)
    with BuildSketch(Plane(origin=(8.89, 0, 15.3979316793), x_dir=(0.8660254038, 0, -0.5), z_dir=(0.5, 0, 0.8660254038))):
        with BuildLine():
            ThreePointArc((1.5, -4.445), (1.0606601718, -3.3843398282), (0, -2.945))
            Line((0, -2.945), (0, -4.445))
            Line((0, -4.445), (0, -5.945))
            ThreePointArc((0, -5.945), (1.0606601718, -5.5056601718), (1.5, -4.445))
        make_face()
        with BuildLine():
            Line((0, -4.445), (0, -2.945))
            ThreePointArc((0, -2.945), (-1.5, -4.445), (0, -5.945))
            Line((0, -5.945), (0, -4.445))
        make_face()
    extrude(amount=-F16_DEPTH, mode=Mode.SUBTRACT)


solid = f1.part
